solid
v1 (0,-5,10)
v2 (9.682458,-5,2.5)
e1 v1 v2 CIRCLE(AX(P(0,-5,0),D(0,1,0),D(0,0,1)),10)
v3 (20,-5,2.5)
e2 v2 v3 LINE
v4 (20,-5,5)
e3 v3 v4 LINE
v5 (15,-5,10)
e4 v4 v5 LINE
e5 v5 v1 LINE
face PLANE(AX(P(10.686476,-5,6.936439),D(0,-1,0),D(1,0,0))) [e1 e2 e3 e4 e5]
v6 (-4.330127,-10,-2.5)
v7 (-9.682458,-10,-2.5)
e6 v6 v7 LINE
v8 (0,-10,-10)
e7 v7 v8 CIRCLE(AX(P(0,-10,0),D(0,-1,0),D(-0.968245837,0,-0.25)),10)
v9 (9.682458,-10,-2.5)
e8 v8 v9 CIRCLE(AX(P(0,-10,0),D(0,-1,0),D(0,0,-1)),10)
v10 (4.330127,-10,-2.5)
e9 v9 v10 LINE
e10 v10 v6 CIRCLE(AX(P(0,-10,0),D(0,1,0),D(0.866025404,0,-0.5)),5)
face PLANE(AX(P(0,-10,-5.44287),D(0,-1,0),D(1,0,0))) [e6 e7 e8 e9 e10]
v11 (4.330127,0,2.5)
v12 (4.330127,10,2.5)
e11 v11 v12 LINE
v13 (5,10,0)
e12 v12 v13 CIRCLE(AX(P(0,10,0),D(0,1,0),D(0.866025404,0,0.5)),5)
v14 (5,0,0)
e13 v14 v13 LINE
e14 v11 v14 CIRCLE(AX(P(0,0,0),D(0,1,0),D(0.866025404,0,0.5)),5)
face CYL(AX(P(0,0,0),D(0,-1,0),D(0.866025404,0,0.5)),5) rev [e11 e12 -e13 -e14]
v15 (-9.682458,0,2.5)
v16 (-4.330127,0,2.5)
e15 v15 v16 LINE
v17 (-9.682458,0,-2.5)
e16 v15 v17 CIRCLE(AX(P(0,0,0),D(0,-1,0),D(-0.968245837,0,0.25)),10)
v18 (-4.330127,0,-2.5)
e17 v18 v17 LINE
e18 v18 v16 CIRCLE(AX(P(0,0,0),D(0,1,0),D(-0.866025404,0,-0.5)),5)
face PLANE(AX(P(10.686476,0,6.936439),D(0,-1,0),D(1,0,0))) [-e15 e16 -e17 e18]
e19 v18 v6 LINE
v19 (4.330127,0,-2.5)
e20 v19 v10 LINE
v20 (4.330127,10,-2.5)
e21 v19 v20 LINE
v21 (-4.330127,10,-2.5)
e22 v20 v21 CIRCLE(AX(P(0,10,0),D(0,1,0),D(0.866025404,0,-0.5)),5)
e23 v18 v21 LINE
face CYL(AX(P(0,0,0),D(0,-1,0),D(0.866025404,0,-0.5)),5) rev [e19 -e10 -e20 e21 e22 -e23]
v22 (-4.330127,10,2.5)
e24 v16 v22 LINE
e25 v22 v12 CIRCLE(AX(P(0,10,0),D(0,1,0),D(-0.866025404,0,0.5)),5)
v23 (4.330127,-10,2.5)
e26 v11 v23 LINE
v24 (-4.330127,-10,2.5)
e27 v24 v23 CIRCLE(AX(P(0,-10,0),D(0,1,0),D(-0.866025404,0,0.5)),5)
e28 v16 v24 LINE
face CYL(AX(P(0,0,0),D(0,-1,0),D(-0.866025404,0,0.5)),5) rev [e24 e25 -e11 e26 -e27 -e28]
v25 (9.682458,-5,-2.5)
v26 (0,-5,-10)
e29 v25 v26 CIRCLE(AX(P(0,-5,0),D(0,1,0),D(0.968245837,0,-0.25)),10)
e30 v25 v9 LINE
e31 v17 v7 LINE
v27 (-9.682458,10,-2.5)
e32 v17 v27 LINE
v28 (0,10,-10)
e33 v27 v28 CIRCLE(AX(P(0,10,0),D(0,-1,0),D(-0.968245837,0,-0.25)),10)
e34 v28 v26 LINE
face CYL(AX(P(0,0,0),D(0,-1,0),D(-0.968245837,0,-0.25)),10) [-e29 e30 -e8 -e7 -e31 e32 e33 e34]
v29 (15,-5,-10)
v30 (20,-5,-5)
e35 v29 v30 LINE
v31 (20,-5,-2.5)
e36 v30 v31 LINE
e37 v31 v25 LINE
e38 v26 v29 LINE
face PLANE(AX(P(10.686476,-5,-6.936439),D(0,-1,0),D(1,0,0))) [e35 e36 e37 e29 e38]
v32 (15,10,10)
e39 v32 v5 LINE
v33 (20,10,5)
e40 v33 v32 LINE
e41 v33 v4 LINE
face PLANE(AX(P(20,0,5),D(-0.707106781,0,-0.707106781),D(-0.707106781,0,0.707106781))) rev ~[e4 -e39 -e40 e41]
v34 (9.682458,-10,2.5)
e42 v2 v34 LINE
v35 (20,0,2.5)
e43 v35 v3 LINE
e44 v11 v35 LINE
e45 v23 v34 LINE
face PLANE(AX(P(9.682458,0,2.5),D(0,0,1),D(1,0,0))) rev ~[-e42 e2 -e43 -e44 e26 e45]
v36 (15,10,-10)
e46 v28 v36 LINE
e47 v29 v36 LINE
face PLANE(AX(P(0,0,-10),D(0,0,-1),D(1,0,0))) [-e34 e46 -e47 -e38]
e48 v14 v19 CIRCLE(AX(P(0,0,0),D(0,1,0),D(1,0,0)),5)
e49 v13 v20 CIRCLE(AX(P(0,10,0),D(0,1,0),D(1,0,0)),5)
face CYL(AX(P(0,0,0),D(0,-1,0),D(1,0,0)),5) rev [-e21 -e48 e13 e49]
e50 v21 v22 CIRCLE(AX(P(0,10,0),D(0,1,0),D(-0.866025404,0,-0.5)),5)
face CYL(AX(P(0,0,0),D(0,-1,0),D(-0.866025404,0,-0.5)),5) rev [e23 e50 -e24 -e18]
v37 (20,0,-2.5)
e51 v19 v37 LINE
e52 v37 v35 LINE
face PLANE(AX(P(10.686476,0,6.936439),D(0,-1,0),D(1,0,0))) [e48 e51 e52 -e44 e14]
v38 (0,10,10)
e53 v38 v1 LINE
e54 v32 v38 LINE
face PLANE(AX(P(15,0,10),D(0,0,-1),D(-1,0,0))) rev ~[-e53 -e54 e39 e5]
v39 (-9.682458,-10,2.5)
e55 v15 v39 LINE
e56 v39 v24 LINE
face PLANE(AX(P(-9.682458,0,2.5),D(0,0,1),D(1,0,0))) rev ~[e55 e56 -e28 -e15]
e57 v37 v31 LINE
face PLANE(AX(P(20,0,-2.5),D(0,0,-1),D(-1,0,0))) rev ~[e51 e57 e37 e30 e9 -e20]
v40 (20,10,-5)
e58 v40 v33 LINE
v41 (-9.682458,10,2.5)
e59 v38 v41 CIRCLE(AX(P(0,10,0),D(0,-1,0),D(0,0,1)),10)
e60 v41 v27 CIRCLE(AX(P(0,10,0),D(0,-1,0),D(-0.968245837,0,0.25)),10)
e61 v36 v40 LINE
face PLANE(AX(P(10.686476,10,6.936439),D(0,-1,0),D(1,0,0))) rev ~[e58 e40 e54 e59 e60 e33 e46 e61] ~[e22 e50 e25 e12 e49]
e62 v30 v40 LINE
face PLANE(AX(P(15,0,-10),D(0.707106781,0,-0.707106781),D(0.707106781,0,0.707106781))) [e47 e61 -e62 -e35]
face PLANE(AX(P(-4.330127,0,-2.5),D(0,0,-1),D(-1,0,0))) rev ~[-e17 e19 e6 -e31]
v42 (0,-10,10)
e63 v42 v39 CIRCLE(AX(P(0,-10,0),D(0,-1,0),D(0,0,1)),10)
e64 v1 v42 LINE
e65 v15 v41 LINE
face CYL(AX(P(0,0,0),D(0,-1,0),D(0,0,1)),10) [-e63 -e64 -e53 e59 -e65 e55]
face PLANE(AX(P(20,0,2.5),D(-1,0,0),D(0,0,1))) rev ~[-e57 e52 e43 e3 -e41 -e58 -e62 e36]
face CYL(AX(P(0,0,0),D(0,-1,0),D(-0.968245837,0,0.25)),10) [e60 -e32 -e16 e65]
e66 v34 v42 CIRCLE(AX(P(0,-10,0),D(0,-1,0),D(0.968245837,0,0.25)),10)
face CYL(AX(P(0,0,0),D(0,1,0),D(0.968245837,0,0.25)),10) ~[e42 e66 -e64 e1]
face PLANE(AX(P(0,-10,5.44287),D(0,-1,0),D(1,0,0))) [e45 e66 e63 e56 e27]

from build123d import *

# Parameters (mm, degrees)
F1_DEPTH = 10
F2_DEPTH = 10
F3_DEPTH = 5


# Not quite as in the source:
# - after a boolean that leaves OpenCascade's solid faulty, fix() repairs it


with BuildPart() as f1:
    # F0 (on Front) → F1 (new body)
    with BuildSketch(Plane.XZ):
        with BuildLine():
            Line((4.3301270189, 2.5), (9.6824583655, 2.5))
            ThreePointArc((9.6824583655, 2.5), (6.123724357, 7.9056941504), (0, 10))
            ThreePointArc((0, 10), (-6.123724357, 7.9056941504), (-9.6824583655, 2.5))
            Line((-9.6824583655, 2.5), (-4.3301270189, 2.5))
            ThreePointArc((-4.3301270189, 2.5), (0, 5), (4.3301270189, 2.5))
        make_face()
        with BuildLine():
            Line((-4.3301270189, -2.5), (-9.6824583655, -2.5))
            ThreePointArc((-9.6824583655, -2.5), (-6.123724357, -7.9056941504), (0, -10))
            ThreePointArc((0, -10), (6.123724357, -7.9056941504), (9.6824583655, -2.5))
            Line((9.6824583655, -2.5), (4.3301270189, -2.5))
            ThreePointArc((4.3301270189, -2.5), (0, -5), (-4.3301270189, -2.5))
        make_face()
    extrude(amount=F1_DEPTH)

    # F0 (on Front) → F2 (join)
    with BuildSketch(Plane.XZ):
        with BuildLine():
            ThreePointArc((0, 10), (6.123724357, 7.9056941504), (9.6824583655, 2.5))
            Line((9.6824583655, 2.5), (20, 2.5))
            Line((20, 2.5), (20, 5))
            Line((20, 5), (15, 10))
            Line((15, 10), (0, 10))
        make_face()
        with BuildLine():
            Line((20, -5), (20, -2.5))
            Line((20, -2.5), (9.6824583655, -2.5))
            ThreePointArc((9.6824583655, -2.5), (6.123724357, -7.9056941504), (0, -10))
            Line((0, -10), (15, -10))
            Line((15, -10), (20, -5))
        make_face()
        with BuildLine():
            Line((20, 2.5), (9.6824583655, 2.5))
            Line((9.6824583655, 2.5), (4.3301270189, 2.5))
            ThreePointArc((4.3301270189, 2.5), (4.8296291314, 1.2940952255), (5, 0))
            ThreePointArc((5, 0), (4.8296291314, -1.2940952255), (4.3301270189, -2.5))
            Line((4.3301270189, -2.5), (9.6824583655, -2.5))
            Line((9.6824583655, -2.5), (20, -2.5))
            Line((20, -2.5), (20, 2.5))
        make_face()
        with BuildLine():
            Line((4.3301270189, 2.5), (9.6824583655, 2.5))
            ThreePointArc((9.6824583655, 2.5), (6.123724357, 7.9056941504), (0, 10))
            ThreePointArc((0, 10), (-6.123724357, 7.9056941504), (-9.6824583655, 2.5))
            Line((-9.6824583655, 2.5), (-4.3301270189, 2.5))
            ThreePointArc((-4.3301270189, 2.5), (0, 5), (4.3301270189, 2.5))
        make_face()
        with BuildLine():
            Line((-4.3301270189, 2.5), (-9.6824583655, 2.5))
            ThreePointArc((-9.6824583655, 2.5), (-10, 0), (-9.6824583655, -2.5))
            Line((-9.6824583655, -2.5), (-4.3301270189, -2.5))
            ThreePointArc((-4.3301270189, -2.5), (-5, 0), (-4.3301270189, 2.5))
        make_face()
        with BuildLine():
            Line((-4.3301270189, -2.5), (-9.6824583655, -2.5))
            ThreePointArc((-9.6824583655, -2.5), (-6.123724357, -7.9056941504), (0, -10))
            ThreePointArc((0, -10), (6.123724357, -7.9056941504), (9.6824583655, -2.5))
            Line((9.6824583655, -2.5), (4.3301270189, -2.5))
            ThreePointArc((4.3301270189, -2.5), (0, -5), (-4.3301270189, -2.5))
        make_face()
    extrude(amount=-F2_DEPTH)

    add(f1.part.fix(), mode=Mode.REPLACE)

    # F0 (on Front) → F3 (join)
    with BuildSketch(Plane.XZ):
        with BuildLine():
            ThreePointArc((0, 10), (6.123724357, 7.9056941504), (9.6824583655, 2.5))
            Line((9.6824583655, 2.5), (20, 2.5))
            Line((20, 2.5), (20, 5))
            Line((20, 5), (15, 10))
            Line((15, 10), (0, 10))
        make_face()
        with BuildLine():
            Line((20, -5), (20, -2.5))
            Line((20, -2.5), (9.6824583655, -2.5))
            ThreePointArc((9.6824583655, -2.5), (6.123724357, -7.9056941504), (0, -10))
            Line((0, -10), (15, -10))
            Line((15, -10), (20, -5))
        make_face()
    extrude(amount=F3_DEPTH)


solid = f1.part
